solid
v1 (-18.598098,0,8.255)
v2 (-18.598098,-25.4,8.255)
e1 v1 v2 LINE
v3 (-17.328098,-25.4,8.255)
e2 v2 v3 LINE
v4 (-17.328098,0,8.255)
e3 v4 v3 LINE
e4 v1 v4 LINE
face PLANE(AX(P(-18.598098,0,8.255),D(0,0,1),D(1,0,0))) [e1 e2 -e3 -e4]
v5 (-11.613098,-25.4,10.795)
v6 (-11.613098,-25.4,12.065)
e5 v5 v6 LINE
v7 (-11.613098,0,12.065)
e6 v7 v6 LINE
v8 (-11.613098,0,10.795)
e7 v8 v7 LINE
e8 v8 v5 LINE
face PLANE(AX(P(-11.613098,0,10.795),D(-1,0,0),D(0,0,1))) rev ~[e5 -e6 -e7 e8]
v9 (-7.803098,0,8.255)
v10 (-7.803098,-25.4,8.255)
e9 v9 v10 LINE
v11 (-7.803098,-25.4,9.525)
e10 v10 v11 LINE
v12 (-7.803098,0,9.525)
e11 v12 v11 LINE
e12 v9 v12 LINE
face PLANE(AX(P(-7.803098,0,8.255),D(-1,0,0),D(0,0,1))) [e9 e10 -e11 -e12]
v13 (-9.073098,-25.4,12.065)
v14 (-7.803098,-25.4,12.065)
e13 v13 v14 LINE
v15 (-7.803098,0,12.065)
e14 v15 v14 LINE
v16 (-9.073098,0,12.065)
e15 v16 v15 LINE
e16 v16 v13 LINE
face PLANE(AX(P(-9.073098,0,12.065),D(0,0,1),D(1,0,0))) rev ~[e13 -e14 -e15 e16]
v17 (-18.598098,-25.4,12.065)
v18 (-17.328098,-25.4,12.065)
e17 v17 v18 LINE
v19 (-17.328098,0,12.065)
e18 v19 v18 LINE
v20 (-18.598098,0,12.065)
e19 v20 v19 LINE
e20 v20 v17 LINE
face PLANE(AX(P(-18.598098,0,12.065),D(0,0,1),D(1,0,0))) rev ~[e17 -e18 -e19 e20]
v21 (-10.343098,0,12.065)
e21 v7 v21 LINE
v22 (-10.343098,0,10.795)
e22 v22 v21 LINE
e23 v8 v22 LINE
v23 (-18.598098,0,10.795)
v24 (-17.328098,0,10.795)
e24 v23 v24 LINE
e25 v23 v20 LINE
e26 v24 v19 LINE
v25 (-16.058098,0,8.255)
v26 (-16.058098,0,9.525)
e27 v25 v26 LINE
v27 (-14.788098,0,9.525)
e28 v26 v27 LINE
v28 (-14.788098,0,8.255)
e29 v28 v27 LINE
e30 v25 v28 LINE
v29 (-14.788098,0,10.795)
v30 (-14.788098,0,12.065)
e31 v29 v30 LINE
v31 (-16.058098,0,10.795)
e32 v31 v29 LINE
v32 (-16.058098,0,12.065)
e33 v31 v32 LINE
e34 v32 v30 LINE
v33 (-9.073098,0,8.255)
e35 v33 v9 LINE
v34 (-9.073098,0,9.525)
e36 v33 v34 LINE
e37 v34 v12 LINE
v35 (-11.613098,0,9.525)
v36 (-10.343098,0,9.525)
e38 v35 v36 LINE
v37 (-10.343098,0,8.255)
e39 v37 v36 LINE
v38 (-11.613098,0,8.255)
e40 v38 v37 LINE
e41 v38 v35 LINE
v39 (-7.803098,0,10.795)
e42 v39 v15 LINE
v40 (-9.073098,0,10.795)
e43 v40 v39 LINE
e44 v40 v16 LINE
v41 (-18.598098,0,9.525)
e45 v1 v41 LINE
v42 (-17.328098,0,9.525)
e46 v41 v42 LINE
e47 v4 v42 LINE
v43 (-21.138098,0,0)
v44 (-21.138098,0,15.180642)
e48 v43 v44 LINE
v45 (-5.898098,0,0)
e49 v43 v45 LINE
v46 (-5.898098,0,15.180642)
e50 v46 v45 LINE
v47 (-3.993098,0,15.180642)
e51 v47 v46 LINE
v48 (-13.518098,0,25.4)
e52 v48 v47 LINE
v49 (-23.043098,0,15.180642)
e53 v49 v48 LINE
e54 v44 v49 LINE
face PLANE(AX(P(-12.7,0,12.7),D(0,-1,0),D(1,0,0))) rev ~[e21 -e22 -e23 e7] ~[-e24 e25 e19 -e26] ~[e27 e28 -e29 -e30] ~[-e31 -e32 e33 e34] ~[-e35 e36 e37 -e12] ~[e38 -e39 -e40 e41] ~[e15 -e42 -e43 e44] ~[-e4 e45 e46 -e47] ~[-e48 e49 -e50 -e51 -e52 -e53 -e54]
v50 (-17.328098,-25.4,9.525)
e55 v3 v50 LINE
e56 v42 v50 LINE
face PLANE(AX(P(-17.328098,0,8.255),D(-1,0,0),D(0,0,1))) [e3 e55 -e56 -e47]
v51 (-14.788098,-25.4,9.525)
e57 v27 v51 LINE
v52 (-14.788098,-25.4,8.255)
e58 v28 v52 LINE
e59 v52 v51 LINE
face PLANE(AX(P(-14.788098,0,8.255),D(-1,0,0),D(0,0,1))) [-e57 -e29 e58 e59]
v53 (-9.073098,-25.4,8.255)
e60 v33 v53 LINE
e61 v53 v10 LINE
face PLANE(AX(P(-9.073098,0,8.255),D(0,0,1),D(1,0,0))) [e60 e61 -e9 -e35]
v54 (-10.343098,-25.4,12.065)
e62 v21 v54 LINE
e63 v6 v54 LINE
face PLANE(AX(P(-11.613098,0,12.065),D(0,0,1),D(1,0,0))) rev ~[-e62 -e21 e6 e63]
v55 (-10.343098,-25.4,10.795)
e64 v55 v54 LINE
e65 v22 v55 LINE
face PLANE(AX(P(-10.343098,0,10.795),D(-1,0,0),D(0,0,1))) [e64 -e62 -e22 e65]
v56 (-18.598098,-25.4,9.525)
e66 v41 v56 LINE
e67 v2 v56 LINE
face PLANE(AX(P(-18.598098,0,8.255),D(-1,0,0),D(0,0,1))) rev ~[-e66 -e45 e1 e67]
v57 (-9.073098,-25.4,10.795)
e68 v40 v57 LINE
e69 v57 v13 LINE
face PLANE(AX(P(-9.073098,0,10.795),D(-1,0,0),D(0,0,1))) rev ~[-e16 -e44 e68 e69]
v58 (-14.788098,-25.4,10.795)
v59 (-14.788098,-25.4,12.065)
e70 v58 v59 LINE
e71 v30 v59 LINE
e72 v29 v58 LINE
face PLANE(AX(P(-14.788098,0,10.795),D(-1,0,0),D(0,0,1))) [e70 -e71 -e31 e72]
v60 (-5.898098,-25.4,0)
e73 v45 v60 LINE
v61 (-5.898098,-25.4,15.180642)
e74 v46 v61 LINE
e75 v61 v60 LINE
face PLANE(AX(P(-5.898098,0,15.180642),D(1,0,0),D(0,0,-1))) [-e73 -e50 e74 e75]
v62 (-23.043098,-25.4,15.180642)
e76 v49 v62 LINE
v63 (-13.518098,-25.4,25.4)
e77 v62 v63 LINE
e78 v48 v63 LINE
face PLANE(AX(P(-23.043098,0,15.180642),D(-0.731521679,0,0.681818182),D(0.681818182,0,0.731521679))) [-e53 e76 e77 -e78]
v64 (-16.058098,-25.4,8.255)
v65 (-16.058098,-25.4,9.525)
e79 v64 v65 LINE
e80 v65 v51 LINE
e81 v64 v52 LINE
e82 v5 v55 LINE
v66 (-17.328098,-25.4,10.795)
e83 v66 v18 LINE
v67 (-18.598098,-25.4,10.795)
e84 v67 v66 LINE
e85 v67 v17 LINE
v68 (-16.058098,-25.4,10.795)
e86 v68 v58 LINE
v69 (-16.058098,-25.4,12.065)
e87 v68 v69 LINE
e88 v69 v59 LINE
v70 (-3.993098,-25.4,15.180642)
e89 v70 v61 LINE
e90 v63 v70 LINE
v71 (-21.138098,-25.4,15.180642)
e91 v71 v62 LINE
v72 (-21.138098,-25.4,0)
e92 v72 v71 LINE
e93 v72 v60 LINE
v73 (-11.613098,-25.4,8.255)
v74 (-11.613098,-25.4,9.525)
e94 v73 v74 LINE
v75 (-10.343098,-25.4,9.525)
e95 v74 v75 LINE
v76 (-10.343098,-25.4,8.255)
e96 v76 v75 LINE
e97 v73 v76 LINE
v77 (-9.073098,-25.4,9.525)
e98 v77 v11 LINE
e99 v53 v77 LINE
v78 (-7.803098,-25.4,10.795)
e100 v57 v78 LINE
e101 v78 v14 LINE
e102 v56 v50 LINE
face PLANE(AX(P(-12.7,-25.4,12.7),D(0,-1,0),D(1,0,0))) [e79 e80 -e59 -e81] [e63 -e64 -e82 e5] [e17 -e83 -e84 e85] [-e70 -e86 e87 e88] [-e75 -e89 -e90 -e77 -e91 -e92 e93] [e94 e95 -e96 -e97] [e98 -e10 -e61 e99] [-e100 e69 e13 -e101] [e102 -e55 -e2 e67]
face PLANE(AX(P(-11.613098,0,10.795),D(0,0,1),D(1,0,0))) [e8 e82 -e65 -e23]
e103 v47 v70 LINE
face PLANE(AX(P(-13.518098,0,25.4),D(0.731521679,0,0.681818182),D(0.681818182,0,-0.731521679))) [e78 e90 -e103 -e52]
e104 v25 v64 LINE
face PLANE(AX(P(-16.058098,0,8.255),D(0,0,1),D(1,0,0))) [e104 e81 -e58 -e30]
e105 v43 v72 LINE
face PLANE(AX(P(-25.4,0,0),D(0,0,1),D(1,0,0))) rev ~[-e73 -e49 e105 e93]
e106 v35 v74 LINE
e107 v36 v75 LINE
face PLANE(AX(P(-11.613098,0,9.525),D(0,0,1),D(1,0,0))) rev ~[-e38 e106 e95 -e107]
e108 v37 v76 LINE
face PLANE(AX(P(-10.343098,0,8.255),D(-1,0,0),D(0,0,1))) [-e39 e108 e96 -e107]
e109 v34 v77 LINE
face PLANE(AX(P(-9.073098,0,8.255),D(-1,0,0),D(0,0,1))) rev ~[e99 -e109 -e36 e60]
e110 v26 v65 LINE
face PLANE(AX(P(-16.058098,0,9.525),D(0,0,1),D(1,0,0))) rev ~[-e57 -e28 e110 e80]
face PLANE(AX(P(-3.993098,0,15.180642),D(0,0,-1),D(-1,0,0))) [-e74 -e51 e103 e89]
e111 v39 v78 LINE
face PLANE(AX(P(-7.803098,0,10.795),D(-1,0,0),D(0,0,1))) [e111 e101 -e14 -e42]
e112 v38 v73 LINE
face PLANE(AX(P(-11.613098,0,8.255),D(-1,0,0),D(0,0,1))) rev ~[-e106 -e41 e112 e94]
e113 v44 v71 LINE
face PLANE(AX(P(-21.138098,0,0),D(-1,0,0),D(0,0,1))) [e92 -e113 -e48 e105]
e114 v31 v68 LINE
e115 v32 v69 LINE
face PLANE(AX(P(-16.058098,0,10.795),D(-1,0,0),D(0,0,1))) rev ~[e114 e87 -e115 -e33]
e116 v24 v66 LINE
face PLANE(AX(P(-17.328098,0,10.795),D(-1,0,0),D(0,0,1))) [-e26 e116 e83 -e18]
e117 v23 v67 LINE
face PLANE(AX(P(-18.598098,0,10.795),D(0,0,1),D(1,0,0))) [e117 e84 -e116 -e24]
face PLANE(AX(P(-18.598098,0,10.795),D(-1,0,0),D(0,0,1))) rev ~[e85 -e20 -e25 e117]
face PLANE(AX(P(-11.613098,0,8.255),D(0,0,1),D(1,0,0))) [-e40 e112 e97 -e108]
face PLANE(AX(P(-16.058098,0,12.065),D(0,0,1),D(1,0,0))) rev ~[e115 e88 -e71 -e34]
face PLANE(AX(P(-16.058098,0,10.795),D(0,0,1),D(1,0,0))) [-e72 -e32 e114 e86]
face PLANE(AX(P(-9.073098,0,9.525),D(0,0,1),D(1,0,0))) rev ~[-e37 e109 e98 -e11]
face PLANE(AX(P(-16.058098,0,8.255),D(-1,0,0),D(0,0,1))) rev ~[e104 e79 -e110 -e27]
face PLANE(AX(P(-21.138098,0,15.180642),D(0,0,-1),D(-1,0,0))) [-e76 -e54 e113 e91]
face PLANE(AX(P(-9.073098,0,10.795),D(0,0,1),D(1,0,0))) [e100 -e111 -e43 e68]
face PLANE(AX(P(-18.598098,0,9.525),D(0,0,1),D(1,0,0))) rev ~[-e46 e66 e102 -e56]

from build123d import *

# Parameters (mm, degrees)
F0_W     = 25.4
F0_H     = 25.4
F1_DEPTH = 25.4
F3_DEPTH = 25.4
F2_W     = 1.27
F2_H     = 1.27
F4_DEPTH = 25.4


# Not quite as in the source:
# - the program builds the solid bodies; features that only make, move or delete a surface that nothing else refers to are left out


with BuildPart() as f1:
    # F0 (on Front) → F1 (new body)
    with BuildSketch(Plane.XZ):
        with Locations((-12.7, 12.7)):
            Rectangle(F0_W, F0_H)
    extrude(amount=F1_DEPTH)

    # F2 (on face) → F3 (cut)
    with BuildSketch(Plane.XZ):
        Polygon((-3.9930980909, 15.1806421435), (-5.8980980909, 15.1806421435), (-5.8980980909, 0), (0, 0), (0, 25.4), (-13.5180980909, 25.4), align=None)
        Polygon((-25.4, 0), (-21.1380980909, 0), (-21.1380980909, 15.1806421435), (-23.0430980909, 15.1806421435), (-13.5180980909, 25.4), (-25.4, 25.4), align=None)
    extrude(amount=F3_DEPTH, mode=Mode.SUBTRACT)

    # F2 (on face) → F4 (cut)
    with BuildSketch(Plane.XZ):
        with Locations((-17.9630980909, 11.43)):
            Rectangle(F2_W, F2_H)
        with Locations((-17.9630980909, 8.89)):
            Rectangle(F2_W, F2_H)
        with Locations((-15.4230980909, 11.43)):
            Rectangle(F2_W, F2_H)
        with Locations((-15.4230980909, 8.89)):
            Rectangle(F2_W, F2_H)
        with Locations((-10.9780980909, 8.89)):
            Rectangle(F2_W, F2_H)
        with Locations((-8.4380980909, 8.89)):
            Rectangle(F2_W, F2_H)
        with Locations((-10.9780980909, 11.43)):
            Rectangle(F2_W, F2_H)
        with Locations((-8.4380980909, 11.43)):
            Rectangle(F2_W, F2_H)
    extrude(amount=F4_DEPTH, mode=Mode.SUBTRACT)


solid = f1.part
